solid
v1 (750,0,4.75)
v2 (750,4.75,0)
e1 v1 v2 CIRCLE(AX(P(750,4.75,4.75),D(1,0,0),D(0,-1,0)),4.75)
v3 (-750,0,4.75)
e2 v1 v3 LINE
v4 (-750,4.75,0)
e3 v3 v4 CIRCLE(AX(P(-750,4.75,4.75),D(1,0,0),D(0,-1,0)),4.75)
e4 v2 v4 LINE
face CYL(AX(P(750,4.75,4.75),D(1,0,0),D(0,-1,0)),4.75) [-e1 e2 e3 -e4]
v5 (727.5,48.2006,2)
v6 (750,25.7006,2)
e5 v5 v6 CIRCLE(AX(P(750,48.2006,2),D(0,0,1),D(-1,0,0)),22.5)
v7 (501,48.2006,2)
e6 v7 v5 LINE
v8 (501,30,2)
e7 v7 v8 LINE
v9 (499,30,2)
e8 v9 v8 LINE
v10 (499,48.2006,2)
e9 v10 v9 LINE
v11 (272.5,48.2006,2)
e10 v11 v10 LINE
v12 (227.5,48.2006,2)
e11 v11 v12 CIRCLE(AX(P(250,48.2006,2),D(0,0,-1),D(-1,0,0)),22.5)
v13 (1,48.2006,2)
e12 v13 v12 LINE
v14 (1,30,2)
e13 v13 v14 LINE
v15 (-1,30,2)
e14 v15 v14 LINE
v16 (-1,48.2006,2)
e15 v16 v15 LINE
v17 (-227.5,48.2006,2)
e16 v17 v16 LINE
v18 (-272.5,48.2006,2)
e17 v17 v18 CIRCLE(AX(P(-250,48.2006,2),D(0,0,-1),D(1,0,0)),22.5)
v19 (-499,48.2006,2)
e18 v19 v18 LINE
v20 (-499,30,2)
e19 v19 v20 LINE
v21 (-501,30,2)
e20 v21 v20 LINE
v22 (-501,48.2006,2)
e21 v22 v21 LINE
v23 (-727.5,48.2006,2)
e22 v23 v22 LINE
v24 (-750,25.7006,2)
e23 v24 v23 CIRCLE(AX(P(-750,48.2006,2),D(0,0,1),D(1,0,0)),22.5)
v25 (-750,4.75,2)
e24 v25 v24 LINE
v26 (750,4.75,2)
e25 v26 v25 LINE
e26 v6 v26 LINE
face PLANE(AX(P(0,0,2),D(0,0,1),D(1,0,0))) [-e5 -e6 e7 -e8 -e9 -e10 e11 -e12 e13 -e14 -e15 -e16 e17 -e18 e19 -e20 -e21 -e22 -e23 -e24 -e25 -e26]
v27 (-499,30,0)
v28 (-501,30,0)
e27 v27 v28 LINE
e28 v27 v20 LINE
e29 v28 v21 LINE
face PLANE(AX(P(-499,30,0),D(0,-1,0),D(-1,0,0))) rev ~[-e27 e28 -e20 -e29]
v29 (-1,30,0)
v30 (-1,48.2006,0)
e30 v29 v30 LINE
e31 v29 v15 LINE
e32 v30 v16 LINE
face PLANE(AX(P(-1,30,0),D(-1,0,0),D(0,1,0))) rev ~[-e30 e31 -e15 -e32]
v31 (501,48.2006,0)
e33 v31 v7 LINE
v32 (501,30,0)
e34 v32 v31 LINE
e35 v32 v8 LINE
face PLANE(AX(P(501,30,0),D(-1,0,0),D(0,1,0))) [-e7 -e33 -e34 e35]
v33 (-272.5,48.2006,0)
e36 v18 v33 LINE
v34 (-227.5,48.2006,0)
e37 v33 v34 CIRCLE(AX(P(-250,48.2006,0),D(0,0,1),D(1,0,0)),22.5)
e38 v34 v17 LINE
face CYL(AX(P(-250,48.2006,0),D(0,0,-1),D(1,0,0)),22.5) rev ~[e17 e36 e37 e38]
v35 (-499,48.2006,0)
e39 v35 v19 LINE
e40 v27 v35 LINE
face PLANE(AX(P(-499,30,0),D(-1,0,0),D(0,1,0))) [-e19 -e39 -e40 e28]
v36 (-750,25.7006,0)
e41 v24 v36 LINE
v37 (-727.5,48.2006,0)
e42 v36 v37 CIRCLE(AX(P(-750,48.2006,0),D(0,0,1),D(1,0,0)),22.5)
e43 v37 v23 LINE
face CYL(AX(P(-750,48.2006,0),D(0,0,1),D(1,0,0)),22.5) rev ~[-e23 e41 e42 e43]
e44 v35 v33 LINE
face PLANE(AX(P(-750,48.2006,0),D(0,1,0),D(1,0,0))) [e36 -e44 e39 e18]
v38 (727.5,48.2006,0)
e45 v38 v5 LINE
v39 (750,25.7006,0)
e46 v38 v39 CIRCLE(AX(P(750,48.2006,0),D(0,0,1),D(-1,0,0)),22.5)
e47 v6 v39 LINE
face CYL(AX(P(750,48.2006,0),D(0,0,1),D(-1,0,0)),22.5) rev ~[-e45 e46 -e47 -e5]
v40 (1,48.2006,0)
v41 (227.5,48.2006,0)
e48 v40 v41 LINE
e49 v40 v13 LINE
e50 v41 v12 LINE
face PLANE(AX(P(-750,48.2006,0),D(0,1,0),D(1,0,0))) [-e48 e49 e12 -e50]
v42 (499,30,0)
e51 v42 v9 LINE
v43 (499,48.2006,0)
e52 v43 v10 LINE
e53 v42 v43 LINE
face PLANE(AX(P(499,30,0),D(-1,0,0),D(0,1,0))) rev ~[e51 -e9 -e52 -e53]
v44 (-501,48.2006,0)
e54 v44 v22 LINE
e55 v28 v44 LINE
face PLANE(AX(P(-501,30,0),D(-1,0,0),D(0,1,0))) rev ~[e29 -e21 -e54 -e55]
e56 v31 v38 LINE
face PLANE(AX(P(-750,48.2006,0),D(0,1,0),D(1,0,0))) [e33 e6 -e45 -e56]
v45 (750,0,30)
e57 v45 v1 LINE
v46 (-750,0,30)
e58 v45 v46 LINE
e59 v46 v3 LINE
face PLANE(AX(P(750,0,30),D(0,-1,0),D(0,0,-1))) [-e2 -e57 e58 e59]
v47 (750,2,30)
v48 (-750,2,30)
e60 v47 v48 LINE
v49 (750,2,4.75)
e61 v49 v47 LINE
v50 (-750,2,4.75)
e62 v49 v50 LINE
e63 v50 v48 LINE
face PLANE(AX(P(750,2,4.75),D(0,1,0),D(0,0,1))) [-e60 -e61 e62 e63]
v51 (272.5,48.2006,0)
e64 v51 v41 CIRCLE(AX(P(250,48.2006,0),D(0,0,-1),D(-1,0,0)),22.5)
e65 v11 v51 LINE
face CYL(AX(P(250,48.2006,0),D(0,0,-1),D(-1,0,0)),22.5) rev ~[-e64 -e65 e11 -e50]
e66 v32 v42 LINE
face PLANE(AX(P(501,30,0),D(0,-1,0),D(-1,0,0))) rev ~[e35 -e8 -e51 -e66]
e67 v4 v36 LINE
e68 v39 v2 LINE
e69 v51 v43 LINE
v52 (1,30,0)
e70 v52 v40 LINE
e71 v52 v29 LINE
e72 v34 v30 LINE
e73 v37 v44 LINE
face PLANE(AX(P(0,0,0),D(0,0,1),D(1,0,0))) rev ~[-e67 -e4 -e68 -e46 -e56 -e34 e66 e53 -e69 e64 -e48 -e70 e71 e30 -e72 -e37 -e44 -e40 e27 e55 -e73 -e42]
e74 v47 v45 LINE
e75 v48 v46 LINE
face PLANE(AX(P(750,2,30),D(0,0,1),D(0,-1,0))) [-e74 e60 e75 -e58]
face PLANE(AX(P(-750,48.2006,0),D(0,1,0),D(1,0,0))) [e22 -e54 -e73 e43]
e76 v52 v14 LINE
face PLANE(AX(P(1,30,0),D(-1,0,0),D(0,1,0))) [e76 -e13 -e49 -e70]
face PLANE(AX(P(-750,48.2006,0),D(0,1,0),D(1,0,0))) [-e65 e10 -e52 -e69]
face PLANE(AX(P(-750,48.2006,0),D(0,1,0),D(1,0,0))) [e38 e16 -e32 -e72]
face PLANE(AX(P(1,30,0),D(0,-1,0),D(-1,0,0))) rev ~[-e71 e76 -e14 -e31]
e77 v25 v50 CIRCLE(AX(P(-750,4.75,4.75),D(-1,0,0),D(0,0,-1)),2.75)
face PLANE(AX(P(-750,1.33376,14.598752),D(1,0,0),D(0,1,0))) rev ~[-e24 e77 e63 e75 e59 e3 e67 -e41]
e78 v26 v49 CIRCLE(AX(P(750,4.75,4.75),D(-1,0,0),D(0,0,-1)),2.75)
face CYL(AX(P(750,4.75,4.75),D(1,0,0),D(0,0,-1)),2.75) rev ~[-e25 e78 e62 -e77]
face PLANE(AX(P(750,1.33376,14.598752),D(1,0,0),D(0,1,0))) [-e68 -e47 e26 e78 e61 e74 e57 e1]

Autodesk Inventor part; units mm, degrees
ref_plane "YZ Plane" through (0, 0, 0) normal (1, 0, 0) x (0, 1, 0)
ref_plane "XZ Plane" through (0, 0, 0) normal (0, 1, 0) x (-1, 0, 0)
ref_plane "XY Plane" through (0, 0, 0) normal (0, 0, 1) x (1, 0, 0)
sketch "Sketch1" plane through (0, 0, 0) normal (0, 0, 1) x (1, 0, 0)
  line L0 (-750, 48.2006) -> (750, 48.2006)
  line L1 (750, 48.2006) -> (750, 0)
  line L2 (750, 0) -> (-750, 0)
  line L3 (-750, 0) -> (-750, 48.2006)
  point P0 (0, 0)
  point P1 (0, 0)
  dimension "d0" = 1500
  dimension "d1" = 48.2006
extrude "Plate1" add sketch "Sketch1" along normal blind 2
sketch "Sketch2" plane through (750, 2, 0) normal (0, -1, 0) x (1, 0, 0)
  line L0 (-1500, 0) -> (0, 0)
  line L1 (0, 0) -> (0, 30)
  line L2 (0, 30) -> (-1500, 30)
  line L3 (-1500, 30) -> (-1500, 0)
edge flange "Flange1" height 30 angle 90 thickness 2 bend radius 2.75 thickness toward (0, -1, 0) relief round relief width 2 relief depth 1 edges at (0, 0, 2) wall of the first edge with corners at (-750, 2, 0) (750, 2, 0) (750, 2, 30) (-750, 2, 30)
bend "Bend1"
corner "Corner1"
sketch "Sketch5" plane through (0, 0, 0) normal (0, 0, -1) x (-1, 0, 0)
  line L0 (750, 48.2006) -> (-750, 48.2006) projected
  line L1 (-1, 30) -> (-1, 48.2006)
  line L2 (750, 0) -> (-750, 0) projected
  line L3 (-1, 30) -> (1, 30)
  line L4 (1, 30) -> (1, 48.2006)
  point P0 (0, 0)
  point P1 (0, 30)
  point P2 (0, 0)
  dimension "d27" = 2
  dimension "d28" = 30
extrude "Extrusion1" cut sketch "Sketch5" against normal through all
pattern_linear "Rectangular Pattern1" count 3 spacing 500 along (1, 0, 0) of "Extrusion1" first direction both ways yes
sketch "Sketch6" plane through (0, 0, 0) normal (0, 0, -1) x (-1, 0, 0)
  line L0 (-750, 48.2006) -> (-750, 4.75) projected
  circle A0 centre (-750, 48.2006) radius 22.5
  line L1 (-750, 48.2006) -> (750, 48.2006) projected
  line L2 (-1, 48.2006) -> (-1, 30) projected
  line L3 (-499, 48.2006) -> (-499, 30) projected
  line L4 (-1, 30) -> (-499, 30) construction
  circle A1 centre (-250, 48.2006) radius 22.5
  point P0 (0, 0)
  point P1 (-727.5, 48.2006)
  point P2 (-750, 25.7006)
  point P3 (-250, 30)
  dimension "d24" = 45
extrude "Extrusion2" cut sketch "Sketch6" along normal mid plane 30 contours L1 A0 L0 | A1 L1 | L1 A1 picked at (-748.3311, 33.3886)
mirror "Mirror1" about plane through (0, 0, 0) normal (1, 0, 0) of "Extrusion2"
sketch "Sketch7" plane through (0, 0, 2) normal (0, 0, 1) x (1, 0, 0)
  arc A0 (-750, 25.7006) -> (-727.5, 48.2006) centre (-750, 48.2006) ccw projected
  line L0 (-750, 4.75) -> (-750, 25.7006) projected
  line L1 (-750, 4.75) -> (750, 4.75) projected
  line L2 (750, 25.7006) -> (750, 4.75) projected
  arc A1 (727.5, 48.2006) -> (750, 25.7006) centre (750, 48.2006) ccw projected
  line L3 (501, 48.2006) -> (727.5, 48.2006) projected
  line L4 (501, 48.2006) -> (501, 30) projected
  line L5 (501, 30) -> (499, 30) projected
  line L6 (499, 30) -> (499, 48.2006) projected
  line L7 (1, 48.2006) -> (227.5, 48.2006) projected
  line L8 (1, 48.2006) -> (1, 30) projected
  line L9 (1, 30) -> (-1, 30) projected
  line L10 (-1, 30) -> (-1, 48.2006) projected
  line L11 (-499, 48.2006) -> (-272.5, 48.2006) projected
  line L12 (-499, 48.2006) -> (-499, 30) projected
  line L13 (-499, 30) -> (-501, 30) projected
  line L14 (-501, 30) -> (-501, 48.2006) projected
  line L15 (-727.5, 48.2006) -> (-501, 48.2006) projected
  line L16 (650, 4.75) -> (650, 48.2006) construction
  line L17 (-750, 4.75) -> (750, 4.75) projected
  circle A2 centre (650, 26.4753) radius 5
  circle A3 centre (630, 26.4753) radius 5
  line L18 (272.5, 48.2006) -> (499, 48.2006) projected
  arc A4 (227.5, 48.2006) -> (272.5, 48.2006) centre (250, 48.2006) ccw projected
  line L19 (-227.5, 48.2006) -> (-1, 48.2006) projected
  arc A5 (-272.5, 48.2006) -> (-227.5, 48.2006) centre (-250, 48.2006) ccw projected
  point P0 (0, 0)
  dimension "d29" = 100
  dimension "d30" = 10
  dimension "d31" = 10
  dimension "d32" = 20
extrude "Extrusion3" [suppressed]
mirror "Mirror2" [suppressed]
sketch "Sketch8" plane through (0, 0, 2) normal (0, 0, 1) x (1, 0, 0)
  line L0 (494, 43.2006) -> (494, 31.2006) construction
  line L1 (494, 31.2006) -> (294, 31.2006) construction
  line L2 (294, 31.2006) -> (294, 43.2006) construction
  line L3 (294, 43.2006) -> (494, 43.2006) construction
  line L4 (501, 48.2006) -> (727.5, 48.2006) projected
  line L5 (272.5, 48.2006) -> (499, 48.2006) projected
  point P0 (0, 0)
  dimension "d35" = 200
  dimension "d36" = 12
  dimension "d39" = 5
  dimension "d40" = 5
mark "Mark1"
equation "\"d28\" = Стрингер_глубина_паза"
equation "\"d1\" = Стрингер_4"
equation "\"d27\" = d18"
equation "\"d2\" = Thickness"
equation "\"d3\" = BendReliefWidth"
equation "\"d4\" = BendReliefDepth"
equation "\"d5\" = MinimumRemnant"
equation "\"d6\" = TransitionRadius"
equation "\"d9\" = BendRadius"
equation "\"d10\" = CornerReliefSize"
equation "\"d11\" = GapSize"
equation "\"d12\" = JacobiRadiusSize"
equation "\"BendReliefWidth\" = Thickness"
equation "\"BendReliefDepth\" = 0.5 * Thickness"
equation "\"CornerReliefSize\" = 4 * Thickness"
equation "\"MinimumRemnant\" = 2 * Thickness"
equation "\"TransitionRadius\" = BendRadius"
equation "\"JacobiRadiusSize\" = BendRadius"
equation "\"GapSize\" = Thickness"
equation "\"d18\" = Thickness"
equation "\"Стрингер_4\" = 48.200594"
equation "\"Thickness\" = 2"
equation "\"BendRadius\" = 2.75"
equation "\"Стрингер_глубина_паза\" = 30"
properties part number "MSC 054 stringer board ##" material "Stainless Steel"
